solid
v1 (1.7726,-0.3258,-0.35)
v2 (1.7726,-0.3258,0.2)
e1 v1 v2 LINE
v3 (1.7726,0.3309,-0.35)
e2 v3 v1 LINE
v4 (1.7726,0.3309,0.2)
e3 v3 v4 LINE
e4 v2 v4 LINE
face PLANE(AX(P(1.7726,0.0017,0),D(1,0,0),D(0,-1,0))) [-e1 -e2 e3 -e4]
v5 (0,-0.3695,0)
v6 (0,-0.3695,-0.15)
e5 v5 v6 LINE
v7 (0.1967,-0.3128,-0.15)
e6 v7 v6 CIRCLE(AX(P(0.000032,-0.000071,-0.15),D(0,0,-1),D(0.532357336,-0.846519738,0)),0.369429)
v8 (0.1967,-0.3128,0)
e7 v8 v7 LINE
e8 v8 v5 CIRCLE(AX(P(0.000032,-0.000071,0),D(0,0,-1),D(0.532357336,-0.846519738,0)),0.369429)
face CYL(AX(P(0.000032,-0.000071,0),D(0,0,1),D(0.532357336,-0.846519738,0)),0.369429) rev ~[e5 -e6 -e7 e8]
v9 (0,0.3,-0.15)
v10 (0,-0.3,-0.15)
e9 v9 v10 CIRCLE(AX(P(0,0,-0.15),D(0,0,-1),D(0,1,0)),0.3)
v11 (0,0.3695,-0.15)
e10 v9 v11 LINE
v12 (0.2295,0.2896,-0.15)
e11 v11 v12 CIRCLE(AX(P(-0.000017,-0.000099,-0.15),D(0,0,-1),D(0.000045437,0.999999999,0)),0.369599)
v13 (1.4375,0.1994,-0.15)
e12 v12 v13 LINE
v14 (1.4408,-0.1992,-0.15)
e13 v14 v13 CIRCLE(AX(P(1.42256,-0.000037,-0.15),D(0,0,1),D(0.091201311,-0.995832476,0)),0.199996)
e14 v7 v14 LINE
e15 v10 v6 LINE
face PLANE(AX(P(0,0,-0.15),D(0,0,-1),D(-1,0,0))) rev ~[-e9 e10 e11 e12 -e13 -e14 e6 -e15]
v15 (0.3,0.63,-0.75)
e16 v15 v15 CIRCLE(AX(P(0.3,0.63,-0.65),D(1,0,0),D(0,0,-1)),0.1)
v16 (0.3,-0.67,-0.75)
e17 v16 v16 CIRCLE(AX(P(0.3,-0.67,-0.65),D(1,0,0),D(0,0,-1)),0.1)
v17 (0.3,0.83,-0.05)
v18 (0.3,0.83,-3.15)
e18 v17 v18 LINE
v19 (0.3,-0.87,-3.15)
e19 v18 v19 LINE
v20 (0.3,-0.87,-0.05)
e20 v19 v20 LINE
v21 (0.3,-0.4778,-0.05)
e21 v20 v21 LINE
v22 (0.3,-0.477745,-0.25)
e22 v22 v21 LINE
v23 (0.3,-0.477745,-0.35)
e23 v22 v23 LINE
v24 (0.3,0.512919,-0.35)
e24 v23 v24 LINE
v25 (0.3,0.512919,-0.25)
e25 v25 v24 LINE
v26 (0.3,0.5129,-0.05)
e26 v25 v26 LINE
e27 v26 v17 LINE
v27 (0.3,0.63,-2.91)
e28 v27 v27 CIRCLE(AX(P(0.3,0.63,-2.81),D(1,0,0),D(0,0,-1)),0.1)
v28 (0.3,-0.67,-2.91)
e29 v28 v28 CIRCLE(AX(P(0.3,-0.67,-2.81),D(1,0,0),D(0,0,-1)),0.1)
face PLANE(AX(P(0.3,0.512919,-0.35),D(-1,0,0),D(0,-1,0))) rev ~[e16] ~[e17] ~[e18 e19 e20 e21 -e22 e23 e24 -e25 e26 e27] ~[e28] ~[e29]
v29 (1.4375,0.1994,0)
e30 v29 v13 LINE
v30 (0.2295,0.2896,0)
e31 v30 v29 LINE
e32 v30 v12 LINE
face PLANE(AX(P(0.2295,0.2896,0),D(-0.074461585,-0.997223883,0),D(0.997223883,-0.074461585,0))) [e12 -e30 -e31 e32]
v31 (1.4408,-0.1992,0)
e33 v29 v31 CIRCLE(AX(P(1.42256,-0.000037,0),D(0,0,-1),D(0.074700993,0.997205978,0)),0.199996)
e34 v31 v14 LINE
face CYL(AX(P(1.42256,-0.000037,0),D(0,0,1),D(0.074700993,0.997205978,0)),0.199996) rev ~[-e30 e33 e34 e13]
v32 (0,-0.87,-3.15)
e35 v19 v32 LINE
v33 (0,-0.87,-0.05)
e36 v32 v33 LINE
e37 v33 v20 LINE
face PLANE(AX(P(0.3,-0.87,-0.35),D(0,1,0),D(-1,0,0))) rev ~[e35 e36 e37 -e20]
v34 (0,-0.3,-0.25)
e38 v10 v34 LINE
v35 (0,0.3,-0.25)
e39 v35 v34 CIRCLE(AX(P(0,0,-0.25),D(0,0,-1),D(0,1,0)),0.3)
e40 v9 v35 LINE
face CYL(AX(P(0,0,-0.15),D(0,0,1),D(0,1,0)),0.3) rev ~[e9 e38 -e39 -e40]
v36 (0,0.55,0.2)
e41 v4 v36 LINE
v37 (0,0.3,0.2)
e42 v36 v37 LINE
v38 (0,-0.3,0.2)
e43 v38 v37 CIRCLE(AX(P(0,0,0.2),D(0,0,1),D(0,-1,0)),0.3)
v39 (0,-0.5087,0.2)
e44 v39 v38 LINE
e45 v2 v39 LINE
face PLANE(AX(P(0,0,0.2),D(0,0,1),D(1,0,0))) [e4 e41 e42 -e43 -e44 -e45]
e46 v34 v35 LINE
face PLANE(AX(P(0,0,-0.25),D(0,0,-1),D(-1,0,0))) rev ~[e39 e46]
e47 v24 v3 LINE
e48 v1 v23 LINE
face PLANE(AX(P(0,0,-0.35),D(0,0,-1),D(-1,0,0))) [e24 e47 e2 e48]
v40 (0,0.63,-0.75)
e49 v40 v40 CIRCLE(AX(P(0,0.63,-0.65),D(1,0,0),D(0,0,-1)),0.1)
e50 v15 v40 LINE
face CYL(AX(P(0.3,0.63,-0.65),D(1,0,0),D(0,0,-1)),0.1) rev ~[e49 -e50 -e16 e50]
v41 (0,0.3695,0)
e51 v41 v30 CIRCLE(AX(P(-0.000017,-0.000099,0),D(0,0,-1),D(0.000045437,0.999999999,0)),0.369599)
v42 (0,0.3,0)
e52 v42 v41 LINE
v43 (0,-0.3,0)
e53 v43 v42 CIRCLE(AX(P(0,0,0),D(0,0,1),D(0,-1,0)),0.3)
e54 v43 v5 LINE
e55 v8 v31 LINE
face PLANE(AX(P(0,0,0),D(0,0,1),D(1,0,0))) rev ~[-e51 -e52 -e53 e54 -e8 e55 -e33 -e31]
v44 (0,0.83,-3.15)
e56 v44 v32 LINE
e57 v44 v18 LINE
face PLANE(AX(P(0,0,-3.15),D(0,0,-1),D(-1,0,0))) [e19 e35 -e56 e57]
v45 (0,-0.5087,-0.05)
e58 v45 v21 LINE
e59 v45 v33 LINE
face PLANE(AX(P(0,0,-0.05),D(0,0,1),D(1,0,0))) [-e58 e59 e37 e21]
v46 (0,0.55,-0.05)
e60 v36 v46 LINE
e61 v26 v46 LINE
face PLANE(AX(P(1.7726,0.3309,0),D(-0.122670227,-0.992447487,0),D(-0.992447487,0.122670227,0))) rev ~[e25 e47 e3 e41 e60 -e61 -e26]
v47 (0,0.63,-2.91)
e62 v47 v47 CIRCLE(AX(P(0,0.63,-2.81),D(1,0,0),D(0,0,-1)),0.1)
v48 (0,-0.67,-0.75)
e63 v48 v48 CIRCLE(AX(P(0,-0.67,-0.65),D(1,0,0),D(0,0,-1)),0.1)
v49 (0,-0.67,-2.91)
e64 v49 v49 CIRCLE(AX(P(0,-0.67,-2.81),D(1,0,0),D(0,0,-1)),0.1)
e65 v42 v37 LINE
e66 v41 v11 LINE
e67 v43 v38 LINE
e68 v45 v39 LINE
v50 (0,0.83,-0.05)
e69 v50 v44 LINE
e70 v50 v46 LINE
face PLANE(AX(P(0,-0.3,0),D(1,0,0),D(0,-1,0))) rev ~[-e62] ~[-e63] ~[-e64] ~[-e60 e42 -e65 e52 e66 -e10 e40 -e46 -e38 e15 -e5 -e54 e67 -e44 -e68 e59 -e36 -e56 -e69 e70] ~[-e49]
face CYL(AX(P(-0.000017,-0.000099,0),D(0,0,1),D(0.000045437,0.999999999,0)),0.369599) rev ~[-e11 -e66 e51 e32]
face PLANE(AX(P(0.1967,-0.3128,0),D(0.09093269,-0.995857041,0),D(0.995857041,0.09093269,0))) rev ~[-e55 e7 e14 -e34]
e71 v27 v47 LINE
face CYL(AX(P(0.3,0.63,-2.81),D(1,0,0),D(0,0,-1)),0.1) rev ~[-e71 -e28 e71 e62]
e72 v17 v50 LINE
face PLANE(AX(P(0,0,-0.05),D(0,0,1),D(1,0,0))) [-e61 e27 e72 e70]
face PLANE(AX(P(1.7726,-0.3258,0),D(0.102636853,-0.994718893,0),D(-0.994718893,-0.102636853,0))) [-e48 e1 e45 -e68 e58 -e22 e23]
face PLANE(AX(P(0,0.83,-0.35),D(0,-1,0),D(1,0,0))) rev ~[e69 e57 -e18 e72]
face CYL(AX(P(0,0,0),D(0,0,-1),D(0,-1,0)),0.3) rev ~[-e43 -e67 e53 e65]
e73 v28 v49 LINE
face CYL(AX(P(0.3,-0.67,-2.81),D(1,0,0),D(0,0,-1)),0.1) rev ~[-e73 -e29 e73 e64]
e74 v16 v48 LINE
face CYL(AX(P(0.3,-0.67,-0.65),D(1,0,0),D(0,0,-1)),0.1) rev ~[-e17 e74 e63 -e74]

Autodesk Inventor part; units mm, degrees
ref_plane "YZ Plane" through (0, 0, 0) normal (1, 0, 0) x (0, 1, 0)
ref_plane "XZ Plane" through (0, 0, 0) normal (0, 1, 0) x (-1, 0, 0)
ref_plane "XY Plane" through (0, 0, 0) normal (0, 0, 1) x (1, 0, 0)
sketch "Boceto1" plane through (0, 0, 0) normal (0, 0, 1) x (1, 0, 0)
  arc A0 (1.4408, -0.1992) -> (1.4375, 0.1994) centre (1.4226, 0) ccw
  line L0 (0.2295, 0.2896) -> (1.4375, 0.1994)
  line L1 (0.1967, -0.3128) -> (1.4408, -0.1992)
  arc A1 (0, -0.3) -> (0, 0.3) centre (0, 0) ccw
  line L2 (0, 0) -> (0, 0.55)
  line L3 (1.7726, 0.3309) -> (0, 0.55)
  line L4 (1.7726, -0.3258) -> (0, -0.5087)
  line L5 (1.6226, 0.0017) -> (1.7726, 0.0017)
  line L6 (1.7726, 0.0017) -> (1.7726, 0.3309)
  line L7 (1.7726, 0.3309) -> (1.7726, -0.3258)
  line L8 (0, 0.55) -> (0, -0.5087)
  arc A2 (0.2295, 0.2896) -> (0, 0.3695) centre (0, 0) ccw
  arc A3 (0, -0.3695) -> (0.1967, -0.3128) centre (0, 0) ccw
  line L9 (0, 0.3) -> (0, -0.3)
extrude "Extrusión1" add sketch "Boceto1" along normal blind 0.2 contours L1 A3 L8 A1 L2 A2 L0 A0 | A0 L5 L7 L4 L8 A3 L1 | A0 L0 A2 L2 L3 L6 L5
sketch "Boceto2" plane through (0, 0, 0) normal (0, 0, -1) x (-1, 0, 0)
  line L0 (0, 0) -> (0, 0.55)
  line L1 (0, 0.55) -> (0, -0.5087)
  line L2 (0, 0.3) -> (0, -0.3)
  line L3 (0, 0) -> (0, 0.55)
  line L4 (0, 0.55) -> (0, -0.5087)
  line L5 (0, 0.3) -> (0, -0.3)
  arc A0 (0, 0.3) -> (0, -0.3) centre (0, 0) ccw
  arc A1 (-0.1967, -0.3128) -> (0, -0.3695) centre (0, 0) ccw
  line L6 (-0.2295, 0.2896) -> (-1.4375, 0.1994)
  line L7 (-0.1967, -0.3128) -> (-1.4408, -0.1992)
  arc A2 (-1.4375, 0.1994) -> (-1.4408, -0.1992) centre (-1.4226, 0) ccw
  line L8 (-1.7726, -0.3258) -> (0, -0.5087)
  line L9 (-1.7726, 0.3309) -> (-1.7726, -0.3258)
  line L10 (-1.7726, 0.0017) -> (-1.7726, 0.3309)
  line L11 (-1.6226, 0.0017) -> (-1.7726, 0.0017)
  line L12 (-1.7726, 0.3309) -> (0, 0.55)
  arc A3 (0, 0.3695) -> (-0.2295, 0.2896) centre (0, 0) ccw
  arc A4 (0, 0.3) -> (0, -0.3) centre (0, 0) ccw
  arc A5 (-0.1967, -0.3128) -> (0, -0.3695) centre (0, 0) ccw
  line L13 (-0.2295, 0.2896) -> (-1.4375, 0.1994)
  line L14 (-0.1967, -0.3128) -> (-1.4408, -0.1992)
  arc A6 (-1.4375, 0.1994) -> (-1.4408, -0.1992) centre (-1.4226, 0) ccw
  line L15 (-1.7726, -0.3258) -> (0, -0.5087)
  line L16 (-1.7726, 0.3309) -> (-1.7726, -0.3258)
  line L17 (-1.7726, 0.0017) -> (-1.7726, 0.3309)
  line L18 (-1.6226, 0.0017) -> (-1.7726, 0.0017)
  line L19 (-1.7726, 0.3309) -> (0, 0.55)
  arc A7 (0, 0.3695) -> (-0.2295, 0.2896) centre (0, 0) ccw
extrude "Extrusión2" add sketch "Boceto2" along normal blind 0.15 contours A3 L6 A2 L11 L9 L12 L0 | L1 L8 L9 L11 A2 L7 A1
sketch "Boceto3" plane through (0, 0, -0.15) normal (0, 0, -1) x (-1, 0, 0)
  arc A0 (0, 0.3695) -> (-0.2295, 0.2896) centre (0, 0) ccw projected
  line L0 (-0.2295, 0.2896) -> (-1.4375, 0.1994) projected
  arc A1 (-1.4375, 0.1994) -> (-1.4408, -0.1992) centre (-1.4226, 0) ccw projected
  line L1 (-1.4408, -0.1992) -> (-0.1967, -0.3128) projected
  arc A2 (-0.1967, -0.3128) -> (0, -0.3695) centre (0, 0) ccw projected
  line L2 (0, -0.3) -> (0, -0.3695) projected
  line L3 (0, -0.5087) -> (0, -0.3695) projected
  arc A3 (-0.1967, -0.3128) -> (0, -0.3695) centre (0, 0) ccw projected
  line L4 (-0.1967, -0.3128) -> (-1.4408, -0.1992) projected
  arc A4 (-1.4375, 0.1994) -> (-1.4408, -0.1992) centre (-1.4226, 0) ccw projected
  line L5 (-1.4375, 0.1994) -> (-0.2295, 0.2896) projected
  arc A5 (0, 0.3695) -> (-0.2295, 0.2896) centre (0, 0) ccw projected
  line L6 (0, 0.3695) -> (0, 0.55) projected
  line L7 (0, 0.55) -> (-1.7726, 0.3309) projected
  line L8 (-1.7726, 0.3309) -> (-1.7726, -0.3258) projected
  line L9 (-1.7726, -0.3258) -> (0, -0.5087) projected
  arc A6 (0, 0.3) -> (0, -0.3) centre (0, 0) ccw projected
  line L10 (0, 0.3695) -> (0, 0.3) projected
extrude "Extrusión3" add sketch "Boceto3" along normal blind 0.2
sketch "Boceto4" plane through (0, 0, -0.35) normal (0, 0, -1) x (-1, 0, 0)
  line L0 (0, -0.5087) -> (0, 0.55) projected
  line L1 (-1.7726, 0.3309) -> (0, 0.55) projected
  line L2 (0, 0.55) -> (0, 0.83)
  line L3 (0, 0.83) -> (-0.3, 0.83)
  line L4 (-0.3, 0.83) -> (-0.3, -0.87)
  line L5 (-0.3, -0.87) -> (0, -0.87)
  line L6 (0, -0.87) -> (0, 0.83)
  point P0 (0, 0)
  dimension "d8" = 0.28
  dimension "d9" = 0.3
  dimension "d10" = 1.7
extrude "Extrusión4" add sketch "Boceto4" along normal blind 2.8 and the other way blind 0.1
sketch "Boceto5" plane through (0.3, -0.4778, -0.35) normal (1, 0, 0) x (0, 0, -1)
  line L0 (0, -0.3922) -> (2.3, -0.3922)
  line L1 (0, -0.3922) -> (0, 1.1078)
  line L2 (0, 1.3078) -> (0, -0.3922)
  line L3 (0, -0.3922) -> (0, -0.1922)
  line L4 (0, 1.3078) -> (2.3, 1.3078)
  line L5 (-0.1, 0.9907) -> (-0.1, 1.3078) projected
  line L6 (0, 0.9907) -> (0, 0.8087) projected
  line L7 (0, 0.9907) -> (0, 1.3078)
  circle A0 centre (0.3, 1.1078) radius 0.1
  circle A1 centre (0.3, -0.1922) radius 0.1
  circle A2 centre (2.46, 1.1078) radius 0.1
  circle A3 centre (2.46, -0.1922) radius 0.1
  line L8 (2.46, 1.1078) -> (2.46, 1.1492)
  point P0 (-0.35, 0.4778)
  dimension "d15" = 0.2
  dimension "d27" = 0.2
extrude "Extrusión5" cut sketch "Boceto5" against normal blind 2.3
sketch "Boceto6" plane through (0, 0, -0.25) normal (0, 0, 1) x (1, 0, 0)
  line L0 (0, -0.5087) -> (0.3, -0.4778) projected
  line L1 (0, -0.5087) -> (0, -0.87) projected
  line L2 (0, -0.87) -> (0.3, -0.87) projected
  line L3 (0.3, -0.87) -> (0.3, -0.4778) projected
  line L4 (0.3, 0.5129) -> (0, 0.55) projected
  line L5 (0.3, 0.5129) -> (0.3, 0.83) projected
  line L6 (0.3, 0.83) -> (0, 0.83) projected
  line L7 (0, 0.83) -> (0, 0.55) projected
  point P0 (0, 0)
extrude "Extrusión6" add sketch "Boceto6" along normal blind 0.2
properties part number "LearnbotSupportCameraC"
